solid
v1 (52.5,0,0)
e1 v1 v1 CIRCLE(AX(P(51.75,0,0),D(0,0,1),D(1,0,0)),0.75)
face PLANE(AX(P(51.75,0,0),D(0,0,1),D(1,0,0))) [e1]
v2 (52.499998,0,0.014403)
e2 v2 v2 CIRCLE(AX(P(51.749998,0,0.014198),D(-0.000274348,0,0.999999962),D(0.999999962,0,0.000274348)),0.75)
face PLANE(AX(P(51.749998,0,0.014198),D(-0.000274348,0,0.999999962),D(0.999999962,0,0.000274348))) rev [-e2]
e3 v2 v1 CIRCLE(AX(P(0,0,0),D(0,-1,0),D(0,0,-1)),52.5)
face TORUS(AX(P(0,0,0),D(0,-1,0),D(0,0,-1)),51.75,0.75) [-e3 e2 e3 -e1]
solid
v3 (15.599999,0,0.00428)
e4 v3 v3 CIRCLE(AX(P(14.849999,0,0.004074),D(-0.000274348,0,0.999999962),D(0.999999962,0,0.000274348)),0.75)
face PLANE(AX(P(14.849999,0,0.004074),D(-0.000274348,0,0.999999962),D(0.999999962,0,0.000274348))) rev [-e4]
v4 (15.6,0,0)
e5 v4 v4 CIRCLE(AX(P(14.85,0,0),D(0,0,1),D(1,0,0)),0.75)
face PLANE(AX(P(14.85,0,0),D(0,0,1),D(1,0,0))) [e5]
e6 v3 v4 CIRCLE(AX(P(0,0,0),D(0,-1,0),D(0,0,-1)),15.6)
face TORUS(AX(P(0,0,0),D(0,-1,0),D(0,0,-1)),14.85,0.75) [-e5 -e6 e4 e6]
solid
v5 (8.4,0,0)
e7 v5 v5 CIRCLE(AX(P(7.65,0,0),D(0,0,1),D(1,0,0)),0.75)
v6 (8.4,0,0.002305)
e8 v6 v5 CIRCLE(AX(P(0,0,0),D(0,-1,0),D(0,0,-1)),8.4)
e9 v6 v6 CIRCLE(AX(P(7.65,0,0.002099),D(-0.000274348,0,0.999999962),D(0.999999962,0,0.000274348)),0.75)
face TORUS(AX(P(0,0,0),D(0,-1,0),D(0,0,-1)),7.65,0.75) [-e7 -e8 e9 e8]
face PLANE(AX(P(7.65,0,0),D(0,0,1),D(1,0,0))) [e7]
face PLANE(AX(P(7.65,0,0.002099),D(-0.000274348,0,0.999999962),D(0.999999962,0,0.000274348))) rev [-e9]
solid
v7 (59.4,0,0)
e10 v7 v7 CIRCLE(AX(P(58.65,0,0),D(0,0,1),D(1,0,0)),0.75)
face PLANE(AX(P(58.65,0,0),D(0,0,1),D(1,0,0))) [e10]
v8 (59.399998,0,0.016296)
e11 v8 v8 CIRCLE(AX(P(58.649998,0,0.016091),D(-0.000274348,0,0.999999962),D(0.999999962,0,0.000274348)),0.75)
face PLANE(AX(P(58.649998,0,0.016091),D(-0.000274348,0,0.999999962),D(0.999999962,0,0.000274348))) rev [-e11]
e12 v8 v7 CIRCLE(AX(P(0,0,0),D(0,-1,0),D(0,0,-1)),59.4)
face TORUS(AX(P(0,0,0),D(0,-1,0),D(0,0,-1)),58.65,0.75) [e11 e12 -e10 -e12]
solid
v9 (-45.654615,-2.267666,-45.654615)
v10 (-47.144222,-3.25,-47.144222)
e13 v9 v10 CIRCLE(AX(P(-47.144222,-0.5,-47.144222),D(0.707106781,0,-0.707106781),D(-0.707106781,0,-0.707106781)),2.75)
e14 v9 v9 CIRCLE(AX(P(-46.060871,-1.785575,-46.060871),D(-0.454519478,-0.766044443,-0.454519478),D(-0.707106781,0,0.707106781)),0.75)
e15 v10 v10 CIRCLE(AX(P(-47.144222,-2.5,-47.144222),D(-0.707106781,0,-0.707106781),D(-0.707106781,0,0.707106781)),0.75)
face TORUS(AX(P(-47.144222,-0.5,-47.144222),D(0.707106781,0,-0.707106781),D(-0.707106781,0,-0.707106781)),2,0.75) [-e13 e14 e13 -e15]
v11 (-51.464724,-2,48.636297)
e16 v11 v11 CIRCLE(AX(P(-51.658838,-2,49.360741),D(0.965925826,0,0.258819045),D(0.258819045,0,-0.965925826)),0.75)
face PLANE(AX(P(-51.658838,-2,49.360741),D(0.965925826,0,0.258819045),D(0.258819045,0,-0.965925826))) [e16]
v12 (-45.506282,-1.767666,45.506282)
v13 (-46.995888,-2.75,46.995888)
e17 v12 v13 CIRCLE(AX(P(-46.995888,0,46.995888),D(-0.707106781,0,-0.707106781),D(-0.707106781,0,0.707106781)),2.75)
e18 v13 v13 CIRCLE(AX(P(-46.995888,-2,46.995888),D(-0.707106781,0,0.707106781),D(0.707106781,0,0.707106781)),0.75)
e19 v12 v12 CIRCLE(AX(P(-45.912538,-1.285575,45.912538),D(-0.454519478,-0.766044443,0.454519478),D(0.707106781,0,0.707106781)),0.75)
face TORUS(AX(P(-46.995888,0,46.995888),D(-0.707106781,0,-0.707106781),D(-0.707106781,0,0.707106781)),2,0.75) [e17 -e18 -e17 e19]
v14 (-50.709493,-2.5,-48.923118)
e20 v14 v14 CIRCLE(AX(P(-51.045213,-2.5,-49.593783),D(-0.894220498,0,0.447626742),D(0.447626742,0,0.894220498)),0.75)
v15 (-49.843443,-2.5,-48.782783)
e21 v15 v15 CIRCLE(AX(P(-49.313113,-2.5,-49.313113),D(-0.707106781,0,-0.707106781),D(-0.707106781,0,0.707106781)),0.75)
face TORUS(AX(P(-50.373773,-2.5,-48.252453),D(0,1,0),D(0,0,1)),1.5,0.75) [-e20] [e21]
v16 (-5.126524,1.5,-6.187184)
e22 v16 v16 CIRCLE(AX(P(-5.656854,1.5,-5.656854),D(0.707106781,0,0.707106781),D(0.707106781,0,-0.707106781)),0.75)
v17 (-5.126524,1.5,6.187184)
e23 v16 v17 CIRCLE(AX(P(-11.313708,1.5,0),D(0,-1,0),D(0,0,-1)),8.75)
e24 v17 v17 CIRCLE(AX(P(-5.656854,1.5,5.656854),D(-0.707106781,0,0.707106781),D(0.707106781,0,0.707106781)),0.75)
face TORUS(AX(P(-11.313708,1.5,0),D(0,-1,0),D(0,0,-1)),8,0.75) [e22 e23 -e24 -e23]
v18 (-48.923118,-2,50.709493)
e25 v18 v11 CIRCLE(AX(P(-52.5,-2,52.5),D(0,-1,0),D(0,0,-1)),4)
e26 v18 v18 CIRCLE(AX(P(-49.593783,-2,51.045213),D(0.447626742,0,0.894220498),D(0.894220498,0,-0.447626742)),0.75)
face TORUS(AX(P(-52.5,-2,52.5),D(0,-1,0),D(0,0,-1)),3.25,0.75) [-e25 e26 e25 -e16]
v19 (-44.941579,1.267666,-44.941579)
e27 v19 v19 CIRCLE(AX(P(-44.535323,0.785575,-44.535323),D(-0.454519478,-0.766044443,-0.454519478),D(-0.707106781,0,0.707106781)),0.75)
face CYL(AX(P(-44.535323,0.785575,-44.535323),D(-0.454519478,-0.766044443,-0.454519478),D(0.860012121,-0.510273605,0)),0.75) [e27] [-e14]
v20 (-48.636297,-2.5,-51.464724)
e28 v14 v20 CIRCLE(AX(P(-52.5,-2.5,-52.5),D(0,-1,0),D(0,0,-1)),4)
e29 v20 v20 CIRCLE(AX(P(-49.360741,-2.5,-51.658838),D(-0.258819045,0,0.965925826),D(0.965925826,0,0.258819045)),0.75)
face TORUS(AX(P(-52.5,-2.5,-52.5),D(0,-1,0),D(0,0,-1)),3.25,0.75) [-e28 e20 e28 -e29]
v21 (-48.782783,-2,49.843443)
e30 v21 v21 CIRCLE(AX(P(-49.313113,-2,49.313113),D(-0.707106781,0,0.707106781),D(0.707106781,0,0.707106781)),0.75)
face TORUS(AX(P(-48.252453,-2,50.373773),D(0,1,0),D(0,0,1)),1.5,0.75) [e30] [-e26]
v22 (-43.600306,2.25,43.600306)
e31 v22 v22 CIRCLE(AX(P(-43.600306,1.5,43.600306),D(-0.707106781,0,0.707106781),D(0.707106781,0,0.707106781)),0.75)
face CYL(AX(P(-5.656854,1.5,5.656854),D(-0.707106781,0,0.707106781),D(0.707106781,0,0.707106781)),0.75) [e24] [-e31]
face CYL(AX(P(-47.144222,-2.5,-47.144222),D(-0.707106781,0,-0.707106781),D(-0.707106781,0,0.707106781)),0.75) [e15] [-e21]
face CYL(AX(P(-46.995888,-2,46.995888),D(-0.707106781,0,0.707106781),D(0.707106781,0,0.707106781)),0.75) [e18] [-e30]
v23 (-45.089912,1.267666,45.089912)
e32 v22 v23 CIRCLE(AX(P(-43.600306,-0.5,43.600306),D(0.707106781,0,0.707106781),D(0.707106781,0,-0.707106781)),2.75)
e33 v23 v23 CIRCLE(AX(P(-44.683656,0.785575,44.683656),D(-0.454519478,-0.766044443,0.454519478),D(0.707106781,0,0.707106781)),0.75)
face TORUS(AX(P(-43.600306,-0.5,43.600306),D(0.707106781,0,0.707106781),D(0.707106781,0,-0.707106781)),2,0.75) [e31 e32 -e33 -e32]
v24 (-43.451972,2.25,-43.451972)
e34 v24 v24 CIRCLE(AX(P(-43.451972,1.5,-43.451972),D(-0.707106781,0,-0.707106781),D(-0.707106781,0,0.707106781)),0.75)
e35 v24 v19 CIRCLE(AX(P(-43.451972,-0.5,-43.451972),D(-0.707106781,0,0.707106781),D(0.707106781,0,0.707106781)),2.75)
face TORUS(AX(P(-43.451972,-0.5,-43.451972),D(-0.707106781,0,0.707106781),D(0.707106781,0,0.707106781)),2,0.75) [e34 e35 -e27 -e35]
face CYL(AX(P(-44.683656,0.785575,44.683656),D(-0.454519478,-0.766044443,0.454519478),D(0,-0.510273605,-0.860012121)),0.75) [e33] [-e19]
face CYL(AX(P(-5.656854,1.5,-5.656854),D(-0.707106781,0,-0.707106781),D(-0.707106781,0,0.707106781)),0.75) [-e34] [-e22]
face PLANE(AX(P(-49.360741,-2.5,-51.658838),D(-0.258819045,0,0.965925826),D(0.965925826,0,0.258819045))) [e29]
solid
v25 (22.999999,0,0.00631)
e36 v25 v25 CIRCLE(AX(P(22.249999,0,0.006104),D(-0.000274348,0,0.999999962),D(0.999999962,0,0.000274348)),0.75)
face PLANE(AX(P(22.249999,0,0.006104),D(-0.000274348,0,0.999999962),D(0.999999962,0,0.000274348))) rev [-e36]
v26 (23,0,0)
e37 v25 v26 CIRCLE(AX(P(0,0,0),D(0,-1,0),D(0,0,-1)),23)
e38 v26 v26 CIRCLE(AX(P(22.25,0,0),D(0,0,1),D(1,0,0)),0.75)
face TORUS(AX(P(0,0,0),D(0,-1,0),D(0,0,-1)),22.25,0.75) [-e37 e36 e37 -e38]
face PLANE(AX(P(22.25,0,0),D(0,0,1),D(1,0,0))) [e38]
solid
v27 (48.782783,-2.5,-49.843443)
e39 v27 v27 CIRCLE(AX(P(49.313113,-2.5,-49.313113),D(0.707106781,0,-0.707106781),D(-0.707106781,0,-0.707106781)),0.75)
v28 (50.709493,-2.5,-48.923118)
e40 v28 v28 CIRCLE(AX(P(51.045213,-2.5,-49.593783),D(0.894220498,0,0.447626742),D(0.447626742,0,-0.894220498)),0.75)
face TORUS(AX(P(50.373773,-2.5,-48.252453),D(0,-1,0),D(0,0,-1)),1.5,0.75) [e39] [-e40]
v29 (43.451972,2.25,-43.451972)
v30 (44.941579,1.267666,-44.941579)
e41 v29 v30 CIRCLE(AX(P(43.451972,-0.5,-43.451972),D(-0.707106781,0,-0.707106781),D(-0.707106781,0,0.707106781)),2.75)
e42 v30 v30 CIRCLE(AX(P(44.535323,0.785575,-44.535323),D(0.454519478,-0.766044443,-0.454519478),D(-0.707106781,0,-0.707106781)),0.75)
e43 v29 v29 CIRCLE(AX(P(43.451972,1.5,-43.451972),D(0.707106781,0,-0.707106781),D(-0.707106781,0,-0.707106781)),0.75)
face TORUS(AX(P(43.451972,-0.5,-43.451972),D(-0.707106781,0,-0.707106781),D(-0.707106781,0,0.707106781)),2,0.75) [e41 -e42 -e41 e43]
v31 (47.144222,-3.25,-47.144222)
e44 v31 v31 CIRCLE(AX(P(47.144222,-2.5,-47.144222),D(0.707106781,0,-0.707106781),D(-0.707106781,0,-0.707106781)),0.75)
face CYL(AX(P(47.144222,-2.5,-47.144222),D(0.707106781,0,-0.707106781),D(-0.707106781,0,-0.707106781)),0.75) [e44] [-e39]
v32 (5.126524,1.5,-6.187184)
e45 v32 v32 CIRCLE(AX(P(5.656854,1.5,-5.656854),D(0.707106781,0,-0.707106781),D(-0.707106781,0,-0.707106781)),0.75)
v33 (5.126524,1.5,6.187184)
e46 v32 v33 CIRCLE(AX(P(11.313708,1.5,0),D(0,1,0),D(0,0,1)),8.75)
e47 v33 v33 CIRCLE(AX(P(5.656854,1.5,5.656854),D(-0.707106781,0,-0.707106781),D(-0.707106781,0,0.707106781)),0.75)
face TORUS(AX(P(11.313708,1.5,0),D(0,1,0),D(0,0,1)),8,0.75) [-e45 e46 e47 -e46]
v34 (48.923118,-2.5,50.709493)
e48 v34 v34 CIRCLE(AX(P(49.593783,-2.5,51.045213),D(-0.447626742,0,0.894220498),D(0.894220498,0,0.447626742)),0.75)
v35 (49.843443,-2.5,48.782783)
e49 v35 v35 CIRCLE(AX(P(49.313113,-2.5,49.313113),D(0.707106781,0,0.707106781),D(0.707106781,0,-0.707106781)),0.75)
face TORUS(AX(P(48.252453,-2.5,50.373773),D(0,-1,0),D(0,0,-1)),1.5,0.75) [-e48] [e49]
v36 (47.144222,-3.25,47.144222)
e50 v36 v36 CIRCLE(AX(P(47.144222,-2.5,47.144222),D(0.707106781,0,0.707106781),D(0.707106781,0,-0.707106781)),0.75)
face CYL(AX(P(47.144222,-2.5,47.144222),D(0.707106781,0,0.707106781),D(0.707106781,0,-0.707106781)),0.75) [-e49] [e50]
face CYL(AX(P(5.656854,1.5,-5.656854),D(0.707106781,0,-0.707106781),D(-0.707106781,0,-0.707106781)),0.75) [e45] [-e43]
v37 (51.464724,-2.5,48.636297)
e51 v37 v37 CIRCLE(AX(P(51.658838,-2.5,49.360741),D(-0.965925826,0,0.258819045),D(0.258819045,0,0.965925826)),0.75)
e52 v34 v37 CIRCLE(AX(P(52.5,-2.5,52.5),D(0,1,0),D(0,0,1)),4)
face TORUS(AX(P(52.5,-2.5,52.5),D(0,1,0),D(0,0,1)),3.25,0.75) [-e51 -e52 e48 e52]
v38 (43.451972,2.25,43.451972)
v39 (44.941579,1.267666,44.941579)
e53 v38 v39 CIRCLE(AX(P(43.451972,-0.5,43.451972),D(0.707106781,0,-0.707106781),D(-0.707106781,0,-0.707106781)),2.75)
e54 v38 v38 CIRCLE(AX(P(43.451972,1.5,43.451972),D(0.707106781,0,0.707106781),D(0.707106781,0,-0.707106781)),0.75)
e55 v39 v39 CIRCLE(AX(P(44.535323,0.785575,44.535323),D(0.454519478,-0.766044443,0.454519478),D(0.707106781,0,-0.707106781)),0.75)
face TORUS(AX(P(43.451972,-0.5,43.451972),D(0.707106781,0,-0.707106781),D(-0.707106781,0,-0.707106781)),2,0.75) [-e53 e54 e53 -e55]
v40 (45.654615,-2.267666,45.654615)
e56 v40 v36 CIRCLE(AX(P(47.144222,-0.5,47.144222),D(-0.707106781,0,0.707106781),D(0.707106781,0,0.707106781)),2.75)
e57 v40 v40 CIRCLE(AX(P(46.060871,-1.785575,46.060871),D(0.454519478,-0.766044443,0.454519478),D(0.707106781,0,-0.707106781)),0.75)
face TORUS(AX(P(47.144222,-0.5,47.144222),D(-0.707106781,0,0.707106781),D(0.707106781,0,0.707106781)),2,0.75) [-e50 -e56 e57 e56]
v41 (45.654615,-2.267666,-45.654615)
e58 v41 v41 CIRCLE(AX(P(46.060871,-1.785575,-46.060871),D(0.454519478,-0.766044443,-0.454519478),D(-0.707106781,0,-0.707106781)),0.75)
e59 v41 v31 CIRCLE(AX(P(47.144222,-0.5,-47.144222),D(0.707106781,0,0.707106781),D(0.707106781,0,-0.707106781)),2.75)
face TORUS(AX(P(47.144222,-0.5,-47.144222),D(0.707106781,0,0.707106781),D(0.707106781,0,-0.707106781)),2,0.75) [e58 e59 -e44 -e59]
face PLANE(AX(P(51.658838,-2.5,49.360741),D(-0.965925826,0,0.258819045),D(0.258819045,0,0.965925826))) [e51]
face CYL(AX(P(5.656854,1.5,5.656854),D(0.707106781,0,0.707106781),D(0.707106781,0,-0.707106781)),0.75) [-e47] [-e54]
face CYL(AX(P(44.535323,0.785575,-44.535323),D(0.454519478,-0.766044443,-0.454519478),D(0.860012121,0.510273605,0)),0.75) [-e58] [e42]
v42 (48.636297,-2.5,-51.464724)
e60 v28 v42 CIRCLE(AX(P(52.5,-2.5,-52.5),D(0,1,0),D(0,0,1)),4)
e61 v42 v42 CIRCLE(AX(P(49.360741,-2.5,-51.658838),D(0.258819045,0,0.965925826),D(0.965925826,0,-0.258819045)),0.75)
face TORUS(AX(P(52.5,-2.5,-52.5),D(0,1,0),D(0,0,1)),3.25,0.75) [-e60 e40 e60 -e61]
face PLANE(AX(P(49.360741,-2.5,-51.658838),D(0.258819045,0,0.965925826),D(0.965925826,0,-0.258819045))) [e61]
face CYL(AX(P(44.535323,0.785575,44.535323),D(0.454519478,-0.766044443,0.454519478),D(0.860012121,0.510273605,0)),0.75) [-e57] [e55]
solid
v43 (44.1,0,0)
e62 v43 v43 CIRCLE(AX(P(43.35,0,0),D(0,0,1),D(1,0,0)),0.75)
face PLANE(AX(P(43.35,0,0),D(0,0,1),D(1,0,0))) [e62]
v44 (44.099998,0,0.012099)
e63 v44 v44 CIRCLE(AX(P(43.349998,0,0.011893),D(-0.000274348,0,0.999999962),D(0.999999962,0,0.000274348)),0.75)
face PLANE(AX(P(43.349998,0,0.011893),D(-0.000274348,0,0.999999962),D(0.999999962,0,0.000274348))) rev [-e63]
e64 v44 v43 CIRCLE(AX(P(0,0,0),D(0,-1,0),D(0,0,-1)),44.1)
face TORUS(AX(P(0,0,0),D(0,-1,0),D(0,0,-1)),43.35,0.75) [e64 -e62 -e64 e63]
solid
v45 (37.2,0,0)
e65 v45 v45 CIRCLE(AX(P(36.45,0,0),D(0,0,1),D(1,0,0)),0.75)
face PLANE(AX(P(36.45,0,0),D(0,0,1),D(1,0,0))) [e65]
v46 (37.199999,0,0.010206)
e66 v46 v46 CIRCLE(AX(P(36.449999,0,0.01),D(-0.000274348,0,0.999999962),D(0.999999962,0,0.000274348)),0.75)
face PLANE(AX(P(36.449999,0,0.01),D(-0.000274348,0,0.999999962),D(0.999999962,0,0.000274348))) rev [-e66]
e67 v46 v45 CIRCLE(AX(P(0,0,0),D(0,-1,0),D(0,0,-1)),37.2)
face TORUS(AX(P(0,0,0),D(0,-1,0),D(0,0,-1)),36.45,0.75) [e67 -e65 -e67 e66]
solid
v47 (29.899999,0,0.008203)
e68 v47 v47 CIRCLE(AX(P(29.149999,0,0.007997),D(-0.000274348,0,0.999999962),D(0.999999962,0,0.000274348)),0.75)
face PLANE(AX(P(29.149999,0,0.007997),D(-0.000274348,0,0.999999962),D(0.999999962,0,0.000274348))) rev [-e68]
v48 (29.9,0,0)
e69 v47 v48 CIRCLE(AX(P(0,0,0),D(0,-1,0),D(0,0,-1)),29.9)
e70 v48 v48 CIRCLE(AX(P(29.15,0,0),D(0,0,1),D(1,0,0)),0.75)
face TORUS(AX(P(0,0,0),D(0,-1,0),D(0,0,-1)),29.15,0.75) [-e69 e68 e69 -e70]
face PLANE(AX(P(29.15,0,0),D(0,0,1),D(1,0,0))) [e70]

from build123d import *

# Parameters (mm, degrees)
BALAYAGE2_OUTLINE_R = 0.75
BALAYAGE2_ANGLE     = 359.984281
ESQUISSE4_R         = 0.75
ESQUISSE5_R         = 0.75
ESQUISSE7_R         = 0.75
ESQUISSE8_R         = 0.75
ESQUISSE11_R        = 0.75
ESQUISSE13_R        = 0.75
ESQUISSE19_R        = 0.75
ESQUISSE15_R        = 0.75
ESQUISSE20_R        = 0.75
ESQUISSE21_R        = 0.75


# Read off the part's stored shape, not the designer's step: Balayage2
with BuildPart() as part:
    # Balayage2 outline → Balayage2 (revolve)
    with BuildSketch(Plane.XY):
        with Locations((58.65, 0)):
            Circle(BALAYAGE2_OUTLINE_R)
        with Locations((51.75, 0)):
            Circle(BALAYAGE2_OUTLINE_R)
        with Locations((43.35, 0)):
            Circle(BALAYAGE2_OUTLINE_R)
        with Locations((36.45, 0)):
            Circle(BALAYAGE2_OUTLINE_R)
        with Locations((29.15, 0)):
            Circle(BALAYAGE2_OUTLINE_R)
        with Locations((22.25, 0)):
            Circle(BALAYAGE2_OUTLINE_R)
        with Locations((14.85, 0)):
            Circle(BALAYAGE2_OUTLINE_R)
        with Locations((7.65, 0)):
            Circle(BALAYAGE2_OUTLINE_R)
    revolve(axis=Axis((0, 0, 0), (0, 1, 0)), revolution_arc=BALAYAGE2_ANGLE)


with BuildPart() as body_2:
    # Balayage3: sweep along a path in Esquisse3
    with BuildLine(Plane(origin=(0, 1.5, 0), x_dir=(-1, 0, 0), z_dir=(0, 1, 0))) as balayage3_path:
        Line((-43, -43), (-5.656854249, -5.656854249))
        ThreePointArc((-5.656854249, -5.656854249), (-3.313708499, 0), (-5.656854249, 5.656854249))
        Line((-5.656854249, 5.656854249), (-43, 43))
    # Esquisse4 → Balayage3 (sweep)
    with BuildSketch(Plane(origin=(43, 0, -43), x_dir=(-0.7071067811865488, 0, -0.7071067811865462), z_dir=(0.7071067811865462, 0, -0.7071067811865488))):
        with Locations((0, 1.5)):
            Circle(ESQUISSE4_R)
    sweep(path=balayage3_path.line)

    # Balayage14: sweep along a path in Esquisse9
    with BuildLine(Plane(origin=(0, 0, 0), x_dir=(0.7071067811865488, 0, -0.7071067811865462), z_dir=(0.7071067811865462, 0, 0.7071067811865488))) as balayage14_path:
        Line((60.811183182, 1.5), (61.450368603, 1.5))
        ThreePointArc((61.450368603, 1.5), (62.295605127, 1.312615574), (62.98245749, 0.785575219))
        Line((62.98245749, 0.785575219), (65.139908874, -1.785575219))
        ThreePointArc((65.139908874, -1.785575219), (65.826761237, -2.312615574), (66.671997761, -2.5))
        Line((66.671997761, -2.5), (67.311183182, -2.5))
    # Esquisse8 → Balayage14 (sweep)
    with BuildSketch(Plane(origin=(43, 0, -43), x_dir=(-0.7071067811865488, 0, -0.7071067811865462), z_dir=(0.7071067811865462, 0, -0.7071067811865488))):
        with Locations((0, 1.5)):
            Circle(ESQUISSE8_R)
    sweep(path=balayage14_path.line)

    # Balayage16: sweep along a path in Esquisse12
    with BuildLine(Plane(origin=(0, 0, 0), x_dir=(-0.7071067811865488, 0, -0.7071067811865462), z_dir=(0.7071067811865462, 0, -0.7071067811865488))) as balayage16_path:
        Line((-60.811183182, 1.5), (-61.450368603, 1.5))
        ThreePointArc((-61.450368603, 1.5), (-62.295605127, 1.312615574), (-62.98245749, 0.785575219))
        Line((-62.98245749, 0.785575219), (-65.139908874, -1.785575219))
        ThreePointArc((-65.139908874, -1.785575219), (-65.826761237, -2.312615574), (-66.671997761, -2.5))
        Line((-66.671997761, -2.5), (-67.311183182, -2.5))
    # Esquisse13 → Balayage16 (sweep)
    with BuildSketch(Plane(origin=(43, 0, 43), x_dir=(0.7071067811865457, 0, -0.7071067811865495), z_dir=(0.7071067811865495, 0, 0.7071067811865457))):
        with Locations((0, 1.5)):
            Circle(ESQUISSE13_R)
    sweep(path=balayage16_path.line)

    # Balayage18: sweep along a path in Esquisse16
    with BuildLine(Plane(origin=(0, -2.5, 0), x_dir=(-1, 0, 0), z_dir=(0, 1, 0))) as balayage18_path:
        Line((-47.596194078, 47.596194078), (-49.313112804, 49.313112804))
        ThreePointArc((-49.313112804, 49.313112804), (-49.733139278, 50.133841618), (-49.59378338, 51.045213089))
        ThreePointArc((-49.59378338, 51.045213089), (-54.554281611, 55.018417571), (-51.658838103, 49.360741065))
    # Esquisse19 → Balayage18 (sweep)
    with BuildSketch(Plane(origin=(47.596194078, 0, 47.596194078), x_dir=(0.7071067811865456, 0, -0.7071067811865495), z_dir=(0.7071067811865495, 0, 0.7071067811865456))):
        with Locations((0, -2.5)):
            Circle(ESQUISSE19_R)
    sweep(path=balayage18_path.line)

    # Balayage20: sweep along a path in Esquisse17
    with BuildLine(Plane(origin=(0, -2.5, 0), x_dir=(-1, 0, 0), z_dir=(0, 1, 0))) as balayage20_path:
        Line((-47.596194078, -47.596194078), (-49.313112804, -49.313112804))
        ThreePointArc((-49.313112804, -49.313112804), (-50.133841618, -49.733139278), (-51.045213089, -49.59378338))
        ThreePointArc((-51.045213089, -49.59378338), (-55.018417571, -54.554281611), (-49.360741065, -51.658838103))
    # Esquisse20 → Balayage20 (sweep)
    with BuildSketch(Plane(origin=(47.596194078, 0, -47.596194078), x_dir=(-0.7071067811865488, 0, -0.7071067811865462), z_dir=(0.7071067811865462, 0, -0.7071067811865488))):
        with Locations((0, -2.5)):
            Circle(ESQUISSE20_R)
    sweep(path=balayage20_path.line)


with BuildPart() as body_3:
    # Balayage6: sweep along a path in Esquisse3<5>
    with BuildLine(Plane(origin=(0, 1.5, 0), x_dir=(-1, 0, 0), z_dir=(0, 1, 0))) as balayage6_path:
        Line((43, 43), (5.656854249, 5.656854249))
        ThreePointArc((5.656854249, 5.656854249), (3.313708499, 0), (5.656854249, -5.656854249))
        Line((5.656854249, -5.656854249), (43, -43))
    # Esquisse5 → Balayage6 (sweep)
    with BuildSketch(Plane(origin=(-43, 0, -43), x_dir=(0.7071067811865488, 0, -0.7071067811865462), z_dir=(0.7071067811865462, 0, 0.7071067811865488))):
        with Locations((0, 1.5)):
            Circle(ESQUISSE5_R)
    sweep(path=balayage6_path.line)

    # Balayage8: sweep along a path in Esquisse6
    with BuildLine(Plane(origin=(0, 0, 0), x_dir=(0.7071067811865488, 0, -0.7071067811865462), z_dir=(0.7071067811865462, 0, 0.7071067811865488))) as balayage8_path:
        Line((-60.811183182, 1.5), (-61.660143511, 1.5))
        ThreePointArc((-61.660143511, 1.5), (-62.505380035, 1.312615574), (-63.192232397, 0.785575219))
        Line((-63.192232397, 0.785575219), (-64.930133967, -1.285575219))
        ThreePointArc((-64.930133967, -1.285575219), (-65.616986329, -1.812615574), (-66.462222853, -2))
        Line((-66.462222853, -2), (-67.311183182, -2))
    # Esquisse7 → Balayage8 (sweep)
    with BuildSketch(Plane(origin=(-43, 0, 43), x_dir=(0.7071067811865449, 0, 0.7071067811865502), z_dir=(-0.7071067811865502, 0, 0.7071067811865449))):
        with Locations((0, 1.5)):
            Circle(ESQUISSE7_R)
    sweep(path=balayage8_path.line)

    # Balayage15: sweep along a path in Esquisse10
    with BuildLine(Plane(origin=(0, 0, 0), x_dir=(-0.7071067811865488, 0, -0.7071067811865462), z_dir=(0.7071067811865462, 0, -0.7071067811865488))) as balayage15_path:
        Line((60.811183182, 1.5), (61.450368603, 1.5))
        ThreePointArc((61.450368603, 1.5), (62.295605127, 1.312615574), (62.98245749, 0.785575219))
        Line((62.98245749, 0.785575219), (65.139908874, -1.785575219))
        ThreePointArc((65.139908874, -1.785575219), (65.826761237, -2.312615574), (66.671997761, -2.5))
        Line((66.671997761, -2.5), (67.311183182, -2.5))
    # Esquisse11 → Balayage15 (sweep)
    with BuildSketch(Plane(origin=(-43, 0, -43), x_dir=(-0.7071067811865488, 0, 0.7071067811865462), z_dir=(-0.7071067811865462, 0, -0.7071067811865488))):
        with Locations((0, 1.5)):
            Circle(ESQUISSE11_R)
    sweep(path=balayage15_path.line)

    # Balayage19: sweep along a path in Esquisse14
    with BuildLine(Plane(origin=(0, -2.5, 0), x_dir=(-1, 0, 0), z_dir=(0, 1, 0))) as balayage19_path:
        Line((47.596194078, 47.596194078), (49.313112804, 49.313112804))
        ThreePointArc((49.313112804, 49.313112804), (49.733139278, 50.133841618), (49.59378338, 51.045213089))
        ThreePointArc((49.59378338, 51.045213089), (54.554281611, 55.018417571), (51.658838103, 49.360741065))
    # Esquisse15 → Balayage19 (sweep)
    with BuildSketch(Plane(origin=(-47.596194078, 0, 47.596194078), x_dir=(0.7071067811865449, 0, 0.7071067811865501), z_dir=(-0.7071067811865501, 0, 0.7071067811865449))):
        with Locations((0, -2)):
            Circle(ESQUISSE15_R)
    sweep(path=balayage19_path.line)

    # Balayage21: sweep along a path in Esquisse18
    with BuildLine(Plane(origin=(0, -2.5, 0), x_dir=(-1, 0, 0), z_dir=(0, 1, 0))) as balayage21_path:
        Line((47.596194078, -47.596194078), (49.313112804, -49.313112804))
        ThreePointArc((49.313112804, -49.313112804), (50.133841618, -49.733139278), (51.045213089, -49.59378338))
        ThreePointArc((51.045213089, -49.59378338), (55.018417571, -54.554281611), (49.360741065, -51.658838103))
    # Esquisse21 → Balayage21 (sweep)
    with BuildSketch(Plane(origin=(-47.596194078, 0, -47.596194078), x_dir=(-0.7071067811865488, 0, 0.7071067811865462), z_dir=(-0.7071067811865462, 0, -0.7071067811865488))):
        with Locations((0, -2.5)):
            Circle(ESQUISSE21_R)
    sweep(path=balayage21_path.line)


solid = Compound([part.part, body_2.part, body_3.part])
